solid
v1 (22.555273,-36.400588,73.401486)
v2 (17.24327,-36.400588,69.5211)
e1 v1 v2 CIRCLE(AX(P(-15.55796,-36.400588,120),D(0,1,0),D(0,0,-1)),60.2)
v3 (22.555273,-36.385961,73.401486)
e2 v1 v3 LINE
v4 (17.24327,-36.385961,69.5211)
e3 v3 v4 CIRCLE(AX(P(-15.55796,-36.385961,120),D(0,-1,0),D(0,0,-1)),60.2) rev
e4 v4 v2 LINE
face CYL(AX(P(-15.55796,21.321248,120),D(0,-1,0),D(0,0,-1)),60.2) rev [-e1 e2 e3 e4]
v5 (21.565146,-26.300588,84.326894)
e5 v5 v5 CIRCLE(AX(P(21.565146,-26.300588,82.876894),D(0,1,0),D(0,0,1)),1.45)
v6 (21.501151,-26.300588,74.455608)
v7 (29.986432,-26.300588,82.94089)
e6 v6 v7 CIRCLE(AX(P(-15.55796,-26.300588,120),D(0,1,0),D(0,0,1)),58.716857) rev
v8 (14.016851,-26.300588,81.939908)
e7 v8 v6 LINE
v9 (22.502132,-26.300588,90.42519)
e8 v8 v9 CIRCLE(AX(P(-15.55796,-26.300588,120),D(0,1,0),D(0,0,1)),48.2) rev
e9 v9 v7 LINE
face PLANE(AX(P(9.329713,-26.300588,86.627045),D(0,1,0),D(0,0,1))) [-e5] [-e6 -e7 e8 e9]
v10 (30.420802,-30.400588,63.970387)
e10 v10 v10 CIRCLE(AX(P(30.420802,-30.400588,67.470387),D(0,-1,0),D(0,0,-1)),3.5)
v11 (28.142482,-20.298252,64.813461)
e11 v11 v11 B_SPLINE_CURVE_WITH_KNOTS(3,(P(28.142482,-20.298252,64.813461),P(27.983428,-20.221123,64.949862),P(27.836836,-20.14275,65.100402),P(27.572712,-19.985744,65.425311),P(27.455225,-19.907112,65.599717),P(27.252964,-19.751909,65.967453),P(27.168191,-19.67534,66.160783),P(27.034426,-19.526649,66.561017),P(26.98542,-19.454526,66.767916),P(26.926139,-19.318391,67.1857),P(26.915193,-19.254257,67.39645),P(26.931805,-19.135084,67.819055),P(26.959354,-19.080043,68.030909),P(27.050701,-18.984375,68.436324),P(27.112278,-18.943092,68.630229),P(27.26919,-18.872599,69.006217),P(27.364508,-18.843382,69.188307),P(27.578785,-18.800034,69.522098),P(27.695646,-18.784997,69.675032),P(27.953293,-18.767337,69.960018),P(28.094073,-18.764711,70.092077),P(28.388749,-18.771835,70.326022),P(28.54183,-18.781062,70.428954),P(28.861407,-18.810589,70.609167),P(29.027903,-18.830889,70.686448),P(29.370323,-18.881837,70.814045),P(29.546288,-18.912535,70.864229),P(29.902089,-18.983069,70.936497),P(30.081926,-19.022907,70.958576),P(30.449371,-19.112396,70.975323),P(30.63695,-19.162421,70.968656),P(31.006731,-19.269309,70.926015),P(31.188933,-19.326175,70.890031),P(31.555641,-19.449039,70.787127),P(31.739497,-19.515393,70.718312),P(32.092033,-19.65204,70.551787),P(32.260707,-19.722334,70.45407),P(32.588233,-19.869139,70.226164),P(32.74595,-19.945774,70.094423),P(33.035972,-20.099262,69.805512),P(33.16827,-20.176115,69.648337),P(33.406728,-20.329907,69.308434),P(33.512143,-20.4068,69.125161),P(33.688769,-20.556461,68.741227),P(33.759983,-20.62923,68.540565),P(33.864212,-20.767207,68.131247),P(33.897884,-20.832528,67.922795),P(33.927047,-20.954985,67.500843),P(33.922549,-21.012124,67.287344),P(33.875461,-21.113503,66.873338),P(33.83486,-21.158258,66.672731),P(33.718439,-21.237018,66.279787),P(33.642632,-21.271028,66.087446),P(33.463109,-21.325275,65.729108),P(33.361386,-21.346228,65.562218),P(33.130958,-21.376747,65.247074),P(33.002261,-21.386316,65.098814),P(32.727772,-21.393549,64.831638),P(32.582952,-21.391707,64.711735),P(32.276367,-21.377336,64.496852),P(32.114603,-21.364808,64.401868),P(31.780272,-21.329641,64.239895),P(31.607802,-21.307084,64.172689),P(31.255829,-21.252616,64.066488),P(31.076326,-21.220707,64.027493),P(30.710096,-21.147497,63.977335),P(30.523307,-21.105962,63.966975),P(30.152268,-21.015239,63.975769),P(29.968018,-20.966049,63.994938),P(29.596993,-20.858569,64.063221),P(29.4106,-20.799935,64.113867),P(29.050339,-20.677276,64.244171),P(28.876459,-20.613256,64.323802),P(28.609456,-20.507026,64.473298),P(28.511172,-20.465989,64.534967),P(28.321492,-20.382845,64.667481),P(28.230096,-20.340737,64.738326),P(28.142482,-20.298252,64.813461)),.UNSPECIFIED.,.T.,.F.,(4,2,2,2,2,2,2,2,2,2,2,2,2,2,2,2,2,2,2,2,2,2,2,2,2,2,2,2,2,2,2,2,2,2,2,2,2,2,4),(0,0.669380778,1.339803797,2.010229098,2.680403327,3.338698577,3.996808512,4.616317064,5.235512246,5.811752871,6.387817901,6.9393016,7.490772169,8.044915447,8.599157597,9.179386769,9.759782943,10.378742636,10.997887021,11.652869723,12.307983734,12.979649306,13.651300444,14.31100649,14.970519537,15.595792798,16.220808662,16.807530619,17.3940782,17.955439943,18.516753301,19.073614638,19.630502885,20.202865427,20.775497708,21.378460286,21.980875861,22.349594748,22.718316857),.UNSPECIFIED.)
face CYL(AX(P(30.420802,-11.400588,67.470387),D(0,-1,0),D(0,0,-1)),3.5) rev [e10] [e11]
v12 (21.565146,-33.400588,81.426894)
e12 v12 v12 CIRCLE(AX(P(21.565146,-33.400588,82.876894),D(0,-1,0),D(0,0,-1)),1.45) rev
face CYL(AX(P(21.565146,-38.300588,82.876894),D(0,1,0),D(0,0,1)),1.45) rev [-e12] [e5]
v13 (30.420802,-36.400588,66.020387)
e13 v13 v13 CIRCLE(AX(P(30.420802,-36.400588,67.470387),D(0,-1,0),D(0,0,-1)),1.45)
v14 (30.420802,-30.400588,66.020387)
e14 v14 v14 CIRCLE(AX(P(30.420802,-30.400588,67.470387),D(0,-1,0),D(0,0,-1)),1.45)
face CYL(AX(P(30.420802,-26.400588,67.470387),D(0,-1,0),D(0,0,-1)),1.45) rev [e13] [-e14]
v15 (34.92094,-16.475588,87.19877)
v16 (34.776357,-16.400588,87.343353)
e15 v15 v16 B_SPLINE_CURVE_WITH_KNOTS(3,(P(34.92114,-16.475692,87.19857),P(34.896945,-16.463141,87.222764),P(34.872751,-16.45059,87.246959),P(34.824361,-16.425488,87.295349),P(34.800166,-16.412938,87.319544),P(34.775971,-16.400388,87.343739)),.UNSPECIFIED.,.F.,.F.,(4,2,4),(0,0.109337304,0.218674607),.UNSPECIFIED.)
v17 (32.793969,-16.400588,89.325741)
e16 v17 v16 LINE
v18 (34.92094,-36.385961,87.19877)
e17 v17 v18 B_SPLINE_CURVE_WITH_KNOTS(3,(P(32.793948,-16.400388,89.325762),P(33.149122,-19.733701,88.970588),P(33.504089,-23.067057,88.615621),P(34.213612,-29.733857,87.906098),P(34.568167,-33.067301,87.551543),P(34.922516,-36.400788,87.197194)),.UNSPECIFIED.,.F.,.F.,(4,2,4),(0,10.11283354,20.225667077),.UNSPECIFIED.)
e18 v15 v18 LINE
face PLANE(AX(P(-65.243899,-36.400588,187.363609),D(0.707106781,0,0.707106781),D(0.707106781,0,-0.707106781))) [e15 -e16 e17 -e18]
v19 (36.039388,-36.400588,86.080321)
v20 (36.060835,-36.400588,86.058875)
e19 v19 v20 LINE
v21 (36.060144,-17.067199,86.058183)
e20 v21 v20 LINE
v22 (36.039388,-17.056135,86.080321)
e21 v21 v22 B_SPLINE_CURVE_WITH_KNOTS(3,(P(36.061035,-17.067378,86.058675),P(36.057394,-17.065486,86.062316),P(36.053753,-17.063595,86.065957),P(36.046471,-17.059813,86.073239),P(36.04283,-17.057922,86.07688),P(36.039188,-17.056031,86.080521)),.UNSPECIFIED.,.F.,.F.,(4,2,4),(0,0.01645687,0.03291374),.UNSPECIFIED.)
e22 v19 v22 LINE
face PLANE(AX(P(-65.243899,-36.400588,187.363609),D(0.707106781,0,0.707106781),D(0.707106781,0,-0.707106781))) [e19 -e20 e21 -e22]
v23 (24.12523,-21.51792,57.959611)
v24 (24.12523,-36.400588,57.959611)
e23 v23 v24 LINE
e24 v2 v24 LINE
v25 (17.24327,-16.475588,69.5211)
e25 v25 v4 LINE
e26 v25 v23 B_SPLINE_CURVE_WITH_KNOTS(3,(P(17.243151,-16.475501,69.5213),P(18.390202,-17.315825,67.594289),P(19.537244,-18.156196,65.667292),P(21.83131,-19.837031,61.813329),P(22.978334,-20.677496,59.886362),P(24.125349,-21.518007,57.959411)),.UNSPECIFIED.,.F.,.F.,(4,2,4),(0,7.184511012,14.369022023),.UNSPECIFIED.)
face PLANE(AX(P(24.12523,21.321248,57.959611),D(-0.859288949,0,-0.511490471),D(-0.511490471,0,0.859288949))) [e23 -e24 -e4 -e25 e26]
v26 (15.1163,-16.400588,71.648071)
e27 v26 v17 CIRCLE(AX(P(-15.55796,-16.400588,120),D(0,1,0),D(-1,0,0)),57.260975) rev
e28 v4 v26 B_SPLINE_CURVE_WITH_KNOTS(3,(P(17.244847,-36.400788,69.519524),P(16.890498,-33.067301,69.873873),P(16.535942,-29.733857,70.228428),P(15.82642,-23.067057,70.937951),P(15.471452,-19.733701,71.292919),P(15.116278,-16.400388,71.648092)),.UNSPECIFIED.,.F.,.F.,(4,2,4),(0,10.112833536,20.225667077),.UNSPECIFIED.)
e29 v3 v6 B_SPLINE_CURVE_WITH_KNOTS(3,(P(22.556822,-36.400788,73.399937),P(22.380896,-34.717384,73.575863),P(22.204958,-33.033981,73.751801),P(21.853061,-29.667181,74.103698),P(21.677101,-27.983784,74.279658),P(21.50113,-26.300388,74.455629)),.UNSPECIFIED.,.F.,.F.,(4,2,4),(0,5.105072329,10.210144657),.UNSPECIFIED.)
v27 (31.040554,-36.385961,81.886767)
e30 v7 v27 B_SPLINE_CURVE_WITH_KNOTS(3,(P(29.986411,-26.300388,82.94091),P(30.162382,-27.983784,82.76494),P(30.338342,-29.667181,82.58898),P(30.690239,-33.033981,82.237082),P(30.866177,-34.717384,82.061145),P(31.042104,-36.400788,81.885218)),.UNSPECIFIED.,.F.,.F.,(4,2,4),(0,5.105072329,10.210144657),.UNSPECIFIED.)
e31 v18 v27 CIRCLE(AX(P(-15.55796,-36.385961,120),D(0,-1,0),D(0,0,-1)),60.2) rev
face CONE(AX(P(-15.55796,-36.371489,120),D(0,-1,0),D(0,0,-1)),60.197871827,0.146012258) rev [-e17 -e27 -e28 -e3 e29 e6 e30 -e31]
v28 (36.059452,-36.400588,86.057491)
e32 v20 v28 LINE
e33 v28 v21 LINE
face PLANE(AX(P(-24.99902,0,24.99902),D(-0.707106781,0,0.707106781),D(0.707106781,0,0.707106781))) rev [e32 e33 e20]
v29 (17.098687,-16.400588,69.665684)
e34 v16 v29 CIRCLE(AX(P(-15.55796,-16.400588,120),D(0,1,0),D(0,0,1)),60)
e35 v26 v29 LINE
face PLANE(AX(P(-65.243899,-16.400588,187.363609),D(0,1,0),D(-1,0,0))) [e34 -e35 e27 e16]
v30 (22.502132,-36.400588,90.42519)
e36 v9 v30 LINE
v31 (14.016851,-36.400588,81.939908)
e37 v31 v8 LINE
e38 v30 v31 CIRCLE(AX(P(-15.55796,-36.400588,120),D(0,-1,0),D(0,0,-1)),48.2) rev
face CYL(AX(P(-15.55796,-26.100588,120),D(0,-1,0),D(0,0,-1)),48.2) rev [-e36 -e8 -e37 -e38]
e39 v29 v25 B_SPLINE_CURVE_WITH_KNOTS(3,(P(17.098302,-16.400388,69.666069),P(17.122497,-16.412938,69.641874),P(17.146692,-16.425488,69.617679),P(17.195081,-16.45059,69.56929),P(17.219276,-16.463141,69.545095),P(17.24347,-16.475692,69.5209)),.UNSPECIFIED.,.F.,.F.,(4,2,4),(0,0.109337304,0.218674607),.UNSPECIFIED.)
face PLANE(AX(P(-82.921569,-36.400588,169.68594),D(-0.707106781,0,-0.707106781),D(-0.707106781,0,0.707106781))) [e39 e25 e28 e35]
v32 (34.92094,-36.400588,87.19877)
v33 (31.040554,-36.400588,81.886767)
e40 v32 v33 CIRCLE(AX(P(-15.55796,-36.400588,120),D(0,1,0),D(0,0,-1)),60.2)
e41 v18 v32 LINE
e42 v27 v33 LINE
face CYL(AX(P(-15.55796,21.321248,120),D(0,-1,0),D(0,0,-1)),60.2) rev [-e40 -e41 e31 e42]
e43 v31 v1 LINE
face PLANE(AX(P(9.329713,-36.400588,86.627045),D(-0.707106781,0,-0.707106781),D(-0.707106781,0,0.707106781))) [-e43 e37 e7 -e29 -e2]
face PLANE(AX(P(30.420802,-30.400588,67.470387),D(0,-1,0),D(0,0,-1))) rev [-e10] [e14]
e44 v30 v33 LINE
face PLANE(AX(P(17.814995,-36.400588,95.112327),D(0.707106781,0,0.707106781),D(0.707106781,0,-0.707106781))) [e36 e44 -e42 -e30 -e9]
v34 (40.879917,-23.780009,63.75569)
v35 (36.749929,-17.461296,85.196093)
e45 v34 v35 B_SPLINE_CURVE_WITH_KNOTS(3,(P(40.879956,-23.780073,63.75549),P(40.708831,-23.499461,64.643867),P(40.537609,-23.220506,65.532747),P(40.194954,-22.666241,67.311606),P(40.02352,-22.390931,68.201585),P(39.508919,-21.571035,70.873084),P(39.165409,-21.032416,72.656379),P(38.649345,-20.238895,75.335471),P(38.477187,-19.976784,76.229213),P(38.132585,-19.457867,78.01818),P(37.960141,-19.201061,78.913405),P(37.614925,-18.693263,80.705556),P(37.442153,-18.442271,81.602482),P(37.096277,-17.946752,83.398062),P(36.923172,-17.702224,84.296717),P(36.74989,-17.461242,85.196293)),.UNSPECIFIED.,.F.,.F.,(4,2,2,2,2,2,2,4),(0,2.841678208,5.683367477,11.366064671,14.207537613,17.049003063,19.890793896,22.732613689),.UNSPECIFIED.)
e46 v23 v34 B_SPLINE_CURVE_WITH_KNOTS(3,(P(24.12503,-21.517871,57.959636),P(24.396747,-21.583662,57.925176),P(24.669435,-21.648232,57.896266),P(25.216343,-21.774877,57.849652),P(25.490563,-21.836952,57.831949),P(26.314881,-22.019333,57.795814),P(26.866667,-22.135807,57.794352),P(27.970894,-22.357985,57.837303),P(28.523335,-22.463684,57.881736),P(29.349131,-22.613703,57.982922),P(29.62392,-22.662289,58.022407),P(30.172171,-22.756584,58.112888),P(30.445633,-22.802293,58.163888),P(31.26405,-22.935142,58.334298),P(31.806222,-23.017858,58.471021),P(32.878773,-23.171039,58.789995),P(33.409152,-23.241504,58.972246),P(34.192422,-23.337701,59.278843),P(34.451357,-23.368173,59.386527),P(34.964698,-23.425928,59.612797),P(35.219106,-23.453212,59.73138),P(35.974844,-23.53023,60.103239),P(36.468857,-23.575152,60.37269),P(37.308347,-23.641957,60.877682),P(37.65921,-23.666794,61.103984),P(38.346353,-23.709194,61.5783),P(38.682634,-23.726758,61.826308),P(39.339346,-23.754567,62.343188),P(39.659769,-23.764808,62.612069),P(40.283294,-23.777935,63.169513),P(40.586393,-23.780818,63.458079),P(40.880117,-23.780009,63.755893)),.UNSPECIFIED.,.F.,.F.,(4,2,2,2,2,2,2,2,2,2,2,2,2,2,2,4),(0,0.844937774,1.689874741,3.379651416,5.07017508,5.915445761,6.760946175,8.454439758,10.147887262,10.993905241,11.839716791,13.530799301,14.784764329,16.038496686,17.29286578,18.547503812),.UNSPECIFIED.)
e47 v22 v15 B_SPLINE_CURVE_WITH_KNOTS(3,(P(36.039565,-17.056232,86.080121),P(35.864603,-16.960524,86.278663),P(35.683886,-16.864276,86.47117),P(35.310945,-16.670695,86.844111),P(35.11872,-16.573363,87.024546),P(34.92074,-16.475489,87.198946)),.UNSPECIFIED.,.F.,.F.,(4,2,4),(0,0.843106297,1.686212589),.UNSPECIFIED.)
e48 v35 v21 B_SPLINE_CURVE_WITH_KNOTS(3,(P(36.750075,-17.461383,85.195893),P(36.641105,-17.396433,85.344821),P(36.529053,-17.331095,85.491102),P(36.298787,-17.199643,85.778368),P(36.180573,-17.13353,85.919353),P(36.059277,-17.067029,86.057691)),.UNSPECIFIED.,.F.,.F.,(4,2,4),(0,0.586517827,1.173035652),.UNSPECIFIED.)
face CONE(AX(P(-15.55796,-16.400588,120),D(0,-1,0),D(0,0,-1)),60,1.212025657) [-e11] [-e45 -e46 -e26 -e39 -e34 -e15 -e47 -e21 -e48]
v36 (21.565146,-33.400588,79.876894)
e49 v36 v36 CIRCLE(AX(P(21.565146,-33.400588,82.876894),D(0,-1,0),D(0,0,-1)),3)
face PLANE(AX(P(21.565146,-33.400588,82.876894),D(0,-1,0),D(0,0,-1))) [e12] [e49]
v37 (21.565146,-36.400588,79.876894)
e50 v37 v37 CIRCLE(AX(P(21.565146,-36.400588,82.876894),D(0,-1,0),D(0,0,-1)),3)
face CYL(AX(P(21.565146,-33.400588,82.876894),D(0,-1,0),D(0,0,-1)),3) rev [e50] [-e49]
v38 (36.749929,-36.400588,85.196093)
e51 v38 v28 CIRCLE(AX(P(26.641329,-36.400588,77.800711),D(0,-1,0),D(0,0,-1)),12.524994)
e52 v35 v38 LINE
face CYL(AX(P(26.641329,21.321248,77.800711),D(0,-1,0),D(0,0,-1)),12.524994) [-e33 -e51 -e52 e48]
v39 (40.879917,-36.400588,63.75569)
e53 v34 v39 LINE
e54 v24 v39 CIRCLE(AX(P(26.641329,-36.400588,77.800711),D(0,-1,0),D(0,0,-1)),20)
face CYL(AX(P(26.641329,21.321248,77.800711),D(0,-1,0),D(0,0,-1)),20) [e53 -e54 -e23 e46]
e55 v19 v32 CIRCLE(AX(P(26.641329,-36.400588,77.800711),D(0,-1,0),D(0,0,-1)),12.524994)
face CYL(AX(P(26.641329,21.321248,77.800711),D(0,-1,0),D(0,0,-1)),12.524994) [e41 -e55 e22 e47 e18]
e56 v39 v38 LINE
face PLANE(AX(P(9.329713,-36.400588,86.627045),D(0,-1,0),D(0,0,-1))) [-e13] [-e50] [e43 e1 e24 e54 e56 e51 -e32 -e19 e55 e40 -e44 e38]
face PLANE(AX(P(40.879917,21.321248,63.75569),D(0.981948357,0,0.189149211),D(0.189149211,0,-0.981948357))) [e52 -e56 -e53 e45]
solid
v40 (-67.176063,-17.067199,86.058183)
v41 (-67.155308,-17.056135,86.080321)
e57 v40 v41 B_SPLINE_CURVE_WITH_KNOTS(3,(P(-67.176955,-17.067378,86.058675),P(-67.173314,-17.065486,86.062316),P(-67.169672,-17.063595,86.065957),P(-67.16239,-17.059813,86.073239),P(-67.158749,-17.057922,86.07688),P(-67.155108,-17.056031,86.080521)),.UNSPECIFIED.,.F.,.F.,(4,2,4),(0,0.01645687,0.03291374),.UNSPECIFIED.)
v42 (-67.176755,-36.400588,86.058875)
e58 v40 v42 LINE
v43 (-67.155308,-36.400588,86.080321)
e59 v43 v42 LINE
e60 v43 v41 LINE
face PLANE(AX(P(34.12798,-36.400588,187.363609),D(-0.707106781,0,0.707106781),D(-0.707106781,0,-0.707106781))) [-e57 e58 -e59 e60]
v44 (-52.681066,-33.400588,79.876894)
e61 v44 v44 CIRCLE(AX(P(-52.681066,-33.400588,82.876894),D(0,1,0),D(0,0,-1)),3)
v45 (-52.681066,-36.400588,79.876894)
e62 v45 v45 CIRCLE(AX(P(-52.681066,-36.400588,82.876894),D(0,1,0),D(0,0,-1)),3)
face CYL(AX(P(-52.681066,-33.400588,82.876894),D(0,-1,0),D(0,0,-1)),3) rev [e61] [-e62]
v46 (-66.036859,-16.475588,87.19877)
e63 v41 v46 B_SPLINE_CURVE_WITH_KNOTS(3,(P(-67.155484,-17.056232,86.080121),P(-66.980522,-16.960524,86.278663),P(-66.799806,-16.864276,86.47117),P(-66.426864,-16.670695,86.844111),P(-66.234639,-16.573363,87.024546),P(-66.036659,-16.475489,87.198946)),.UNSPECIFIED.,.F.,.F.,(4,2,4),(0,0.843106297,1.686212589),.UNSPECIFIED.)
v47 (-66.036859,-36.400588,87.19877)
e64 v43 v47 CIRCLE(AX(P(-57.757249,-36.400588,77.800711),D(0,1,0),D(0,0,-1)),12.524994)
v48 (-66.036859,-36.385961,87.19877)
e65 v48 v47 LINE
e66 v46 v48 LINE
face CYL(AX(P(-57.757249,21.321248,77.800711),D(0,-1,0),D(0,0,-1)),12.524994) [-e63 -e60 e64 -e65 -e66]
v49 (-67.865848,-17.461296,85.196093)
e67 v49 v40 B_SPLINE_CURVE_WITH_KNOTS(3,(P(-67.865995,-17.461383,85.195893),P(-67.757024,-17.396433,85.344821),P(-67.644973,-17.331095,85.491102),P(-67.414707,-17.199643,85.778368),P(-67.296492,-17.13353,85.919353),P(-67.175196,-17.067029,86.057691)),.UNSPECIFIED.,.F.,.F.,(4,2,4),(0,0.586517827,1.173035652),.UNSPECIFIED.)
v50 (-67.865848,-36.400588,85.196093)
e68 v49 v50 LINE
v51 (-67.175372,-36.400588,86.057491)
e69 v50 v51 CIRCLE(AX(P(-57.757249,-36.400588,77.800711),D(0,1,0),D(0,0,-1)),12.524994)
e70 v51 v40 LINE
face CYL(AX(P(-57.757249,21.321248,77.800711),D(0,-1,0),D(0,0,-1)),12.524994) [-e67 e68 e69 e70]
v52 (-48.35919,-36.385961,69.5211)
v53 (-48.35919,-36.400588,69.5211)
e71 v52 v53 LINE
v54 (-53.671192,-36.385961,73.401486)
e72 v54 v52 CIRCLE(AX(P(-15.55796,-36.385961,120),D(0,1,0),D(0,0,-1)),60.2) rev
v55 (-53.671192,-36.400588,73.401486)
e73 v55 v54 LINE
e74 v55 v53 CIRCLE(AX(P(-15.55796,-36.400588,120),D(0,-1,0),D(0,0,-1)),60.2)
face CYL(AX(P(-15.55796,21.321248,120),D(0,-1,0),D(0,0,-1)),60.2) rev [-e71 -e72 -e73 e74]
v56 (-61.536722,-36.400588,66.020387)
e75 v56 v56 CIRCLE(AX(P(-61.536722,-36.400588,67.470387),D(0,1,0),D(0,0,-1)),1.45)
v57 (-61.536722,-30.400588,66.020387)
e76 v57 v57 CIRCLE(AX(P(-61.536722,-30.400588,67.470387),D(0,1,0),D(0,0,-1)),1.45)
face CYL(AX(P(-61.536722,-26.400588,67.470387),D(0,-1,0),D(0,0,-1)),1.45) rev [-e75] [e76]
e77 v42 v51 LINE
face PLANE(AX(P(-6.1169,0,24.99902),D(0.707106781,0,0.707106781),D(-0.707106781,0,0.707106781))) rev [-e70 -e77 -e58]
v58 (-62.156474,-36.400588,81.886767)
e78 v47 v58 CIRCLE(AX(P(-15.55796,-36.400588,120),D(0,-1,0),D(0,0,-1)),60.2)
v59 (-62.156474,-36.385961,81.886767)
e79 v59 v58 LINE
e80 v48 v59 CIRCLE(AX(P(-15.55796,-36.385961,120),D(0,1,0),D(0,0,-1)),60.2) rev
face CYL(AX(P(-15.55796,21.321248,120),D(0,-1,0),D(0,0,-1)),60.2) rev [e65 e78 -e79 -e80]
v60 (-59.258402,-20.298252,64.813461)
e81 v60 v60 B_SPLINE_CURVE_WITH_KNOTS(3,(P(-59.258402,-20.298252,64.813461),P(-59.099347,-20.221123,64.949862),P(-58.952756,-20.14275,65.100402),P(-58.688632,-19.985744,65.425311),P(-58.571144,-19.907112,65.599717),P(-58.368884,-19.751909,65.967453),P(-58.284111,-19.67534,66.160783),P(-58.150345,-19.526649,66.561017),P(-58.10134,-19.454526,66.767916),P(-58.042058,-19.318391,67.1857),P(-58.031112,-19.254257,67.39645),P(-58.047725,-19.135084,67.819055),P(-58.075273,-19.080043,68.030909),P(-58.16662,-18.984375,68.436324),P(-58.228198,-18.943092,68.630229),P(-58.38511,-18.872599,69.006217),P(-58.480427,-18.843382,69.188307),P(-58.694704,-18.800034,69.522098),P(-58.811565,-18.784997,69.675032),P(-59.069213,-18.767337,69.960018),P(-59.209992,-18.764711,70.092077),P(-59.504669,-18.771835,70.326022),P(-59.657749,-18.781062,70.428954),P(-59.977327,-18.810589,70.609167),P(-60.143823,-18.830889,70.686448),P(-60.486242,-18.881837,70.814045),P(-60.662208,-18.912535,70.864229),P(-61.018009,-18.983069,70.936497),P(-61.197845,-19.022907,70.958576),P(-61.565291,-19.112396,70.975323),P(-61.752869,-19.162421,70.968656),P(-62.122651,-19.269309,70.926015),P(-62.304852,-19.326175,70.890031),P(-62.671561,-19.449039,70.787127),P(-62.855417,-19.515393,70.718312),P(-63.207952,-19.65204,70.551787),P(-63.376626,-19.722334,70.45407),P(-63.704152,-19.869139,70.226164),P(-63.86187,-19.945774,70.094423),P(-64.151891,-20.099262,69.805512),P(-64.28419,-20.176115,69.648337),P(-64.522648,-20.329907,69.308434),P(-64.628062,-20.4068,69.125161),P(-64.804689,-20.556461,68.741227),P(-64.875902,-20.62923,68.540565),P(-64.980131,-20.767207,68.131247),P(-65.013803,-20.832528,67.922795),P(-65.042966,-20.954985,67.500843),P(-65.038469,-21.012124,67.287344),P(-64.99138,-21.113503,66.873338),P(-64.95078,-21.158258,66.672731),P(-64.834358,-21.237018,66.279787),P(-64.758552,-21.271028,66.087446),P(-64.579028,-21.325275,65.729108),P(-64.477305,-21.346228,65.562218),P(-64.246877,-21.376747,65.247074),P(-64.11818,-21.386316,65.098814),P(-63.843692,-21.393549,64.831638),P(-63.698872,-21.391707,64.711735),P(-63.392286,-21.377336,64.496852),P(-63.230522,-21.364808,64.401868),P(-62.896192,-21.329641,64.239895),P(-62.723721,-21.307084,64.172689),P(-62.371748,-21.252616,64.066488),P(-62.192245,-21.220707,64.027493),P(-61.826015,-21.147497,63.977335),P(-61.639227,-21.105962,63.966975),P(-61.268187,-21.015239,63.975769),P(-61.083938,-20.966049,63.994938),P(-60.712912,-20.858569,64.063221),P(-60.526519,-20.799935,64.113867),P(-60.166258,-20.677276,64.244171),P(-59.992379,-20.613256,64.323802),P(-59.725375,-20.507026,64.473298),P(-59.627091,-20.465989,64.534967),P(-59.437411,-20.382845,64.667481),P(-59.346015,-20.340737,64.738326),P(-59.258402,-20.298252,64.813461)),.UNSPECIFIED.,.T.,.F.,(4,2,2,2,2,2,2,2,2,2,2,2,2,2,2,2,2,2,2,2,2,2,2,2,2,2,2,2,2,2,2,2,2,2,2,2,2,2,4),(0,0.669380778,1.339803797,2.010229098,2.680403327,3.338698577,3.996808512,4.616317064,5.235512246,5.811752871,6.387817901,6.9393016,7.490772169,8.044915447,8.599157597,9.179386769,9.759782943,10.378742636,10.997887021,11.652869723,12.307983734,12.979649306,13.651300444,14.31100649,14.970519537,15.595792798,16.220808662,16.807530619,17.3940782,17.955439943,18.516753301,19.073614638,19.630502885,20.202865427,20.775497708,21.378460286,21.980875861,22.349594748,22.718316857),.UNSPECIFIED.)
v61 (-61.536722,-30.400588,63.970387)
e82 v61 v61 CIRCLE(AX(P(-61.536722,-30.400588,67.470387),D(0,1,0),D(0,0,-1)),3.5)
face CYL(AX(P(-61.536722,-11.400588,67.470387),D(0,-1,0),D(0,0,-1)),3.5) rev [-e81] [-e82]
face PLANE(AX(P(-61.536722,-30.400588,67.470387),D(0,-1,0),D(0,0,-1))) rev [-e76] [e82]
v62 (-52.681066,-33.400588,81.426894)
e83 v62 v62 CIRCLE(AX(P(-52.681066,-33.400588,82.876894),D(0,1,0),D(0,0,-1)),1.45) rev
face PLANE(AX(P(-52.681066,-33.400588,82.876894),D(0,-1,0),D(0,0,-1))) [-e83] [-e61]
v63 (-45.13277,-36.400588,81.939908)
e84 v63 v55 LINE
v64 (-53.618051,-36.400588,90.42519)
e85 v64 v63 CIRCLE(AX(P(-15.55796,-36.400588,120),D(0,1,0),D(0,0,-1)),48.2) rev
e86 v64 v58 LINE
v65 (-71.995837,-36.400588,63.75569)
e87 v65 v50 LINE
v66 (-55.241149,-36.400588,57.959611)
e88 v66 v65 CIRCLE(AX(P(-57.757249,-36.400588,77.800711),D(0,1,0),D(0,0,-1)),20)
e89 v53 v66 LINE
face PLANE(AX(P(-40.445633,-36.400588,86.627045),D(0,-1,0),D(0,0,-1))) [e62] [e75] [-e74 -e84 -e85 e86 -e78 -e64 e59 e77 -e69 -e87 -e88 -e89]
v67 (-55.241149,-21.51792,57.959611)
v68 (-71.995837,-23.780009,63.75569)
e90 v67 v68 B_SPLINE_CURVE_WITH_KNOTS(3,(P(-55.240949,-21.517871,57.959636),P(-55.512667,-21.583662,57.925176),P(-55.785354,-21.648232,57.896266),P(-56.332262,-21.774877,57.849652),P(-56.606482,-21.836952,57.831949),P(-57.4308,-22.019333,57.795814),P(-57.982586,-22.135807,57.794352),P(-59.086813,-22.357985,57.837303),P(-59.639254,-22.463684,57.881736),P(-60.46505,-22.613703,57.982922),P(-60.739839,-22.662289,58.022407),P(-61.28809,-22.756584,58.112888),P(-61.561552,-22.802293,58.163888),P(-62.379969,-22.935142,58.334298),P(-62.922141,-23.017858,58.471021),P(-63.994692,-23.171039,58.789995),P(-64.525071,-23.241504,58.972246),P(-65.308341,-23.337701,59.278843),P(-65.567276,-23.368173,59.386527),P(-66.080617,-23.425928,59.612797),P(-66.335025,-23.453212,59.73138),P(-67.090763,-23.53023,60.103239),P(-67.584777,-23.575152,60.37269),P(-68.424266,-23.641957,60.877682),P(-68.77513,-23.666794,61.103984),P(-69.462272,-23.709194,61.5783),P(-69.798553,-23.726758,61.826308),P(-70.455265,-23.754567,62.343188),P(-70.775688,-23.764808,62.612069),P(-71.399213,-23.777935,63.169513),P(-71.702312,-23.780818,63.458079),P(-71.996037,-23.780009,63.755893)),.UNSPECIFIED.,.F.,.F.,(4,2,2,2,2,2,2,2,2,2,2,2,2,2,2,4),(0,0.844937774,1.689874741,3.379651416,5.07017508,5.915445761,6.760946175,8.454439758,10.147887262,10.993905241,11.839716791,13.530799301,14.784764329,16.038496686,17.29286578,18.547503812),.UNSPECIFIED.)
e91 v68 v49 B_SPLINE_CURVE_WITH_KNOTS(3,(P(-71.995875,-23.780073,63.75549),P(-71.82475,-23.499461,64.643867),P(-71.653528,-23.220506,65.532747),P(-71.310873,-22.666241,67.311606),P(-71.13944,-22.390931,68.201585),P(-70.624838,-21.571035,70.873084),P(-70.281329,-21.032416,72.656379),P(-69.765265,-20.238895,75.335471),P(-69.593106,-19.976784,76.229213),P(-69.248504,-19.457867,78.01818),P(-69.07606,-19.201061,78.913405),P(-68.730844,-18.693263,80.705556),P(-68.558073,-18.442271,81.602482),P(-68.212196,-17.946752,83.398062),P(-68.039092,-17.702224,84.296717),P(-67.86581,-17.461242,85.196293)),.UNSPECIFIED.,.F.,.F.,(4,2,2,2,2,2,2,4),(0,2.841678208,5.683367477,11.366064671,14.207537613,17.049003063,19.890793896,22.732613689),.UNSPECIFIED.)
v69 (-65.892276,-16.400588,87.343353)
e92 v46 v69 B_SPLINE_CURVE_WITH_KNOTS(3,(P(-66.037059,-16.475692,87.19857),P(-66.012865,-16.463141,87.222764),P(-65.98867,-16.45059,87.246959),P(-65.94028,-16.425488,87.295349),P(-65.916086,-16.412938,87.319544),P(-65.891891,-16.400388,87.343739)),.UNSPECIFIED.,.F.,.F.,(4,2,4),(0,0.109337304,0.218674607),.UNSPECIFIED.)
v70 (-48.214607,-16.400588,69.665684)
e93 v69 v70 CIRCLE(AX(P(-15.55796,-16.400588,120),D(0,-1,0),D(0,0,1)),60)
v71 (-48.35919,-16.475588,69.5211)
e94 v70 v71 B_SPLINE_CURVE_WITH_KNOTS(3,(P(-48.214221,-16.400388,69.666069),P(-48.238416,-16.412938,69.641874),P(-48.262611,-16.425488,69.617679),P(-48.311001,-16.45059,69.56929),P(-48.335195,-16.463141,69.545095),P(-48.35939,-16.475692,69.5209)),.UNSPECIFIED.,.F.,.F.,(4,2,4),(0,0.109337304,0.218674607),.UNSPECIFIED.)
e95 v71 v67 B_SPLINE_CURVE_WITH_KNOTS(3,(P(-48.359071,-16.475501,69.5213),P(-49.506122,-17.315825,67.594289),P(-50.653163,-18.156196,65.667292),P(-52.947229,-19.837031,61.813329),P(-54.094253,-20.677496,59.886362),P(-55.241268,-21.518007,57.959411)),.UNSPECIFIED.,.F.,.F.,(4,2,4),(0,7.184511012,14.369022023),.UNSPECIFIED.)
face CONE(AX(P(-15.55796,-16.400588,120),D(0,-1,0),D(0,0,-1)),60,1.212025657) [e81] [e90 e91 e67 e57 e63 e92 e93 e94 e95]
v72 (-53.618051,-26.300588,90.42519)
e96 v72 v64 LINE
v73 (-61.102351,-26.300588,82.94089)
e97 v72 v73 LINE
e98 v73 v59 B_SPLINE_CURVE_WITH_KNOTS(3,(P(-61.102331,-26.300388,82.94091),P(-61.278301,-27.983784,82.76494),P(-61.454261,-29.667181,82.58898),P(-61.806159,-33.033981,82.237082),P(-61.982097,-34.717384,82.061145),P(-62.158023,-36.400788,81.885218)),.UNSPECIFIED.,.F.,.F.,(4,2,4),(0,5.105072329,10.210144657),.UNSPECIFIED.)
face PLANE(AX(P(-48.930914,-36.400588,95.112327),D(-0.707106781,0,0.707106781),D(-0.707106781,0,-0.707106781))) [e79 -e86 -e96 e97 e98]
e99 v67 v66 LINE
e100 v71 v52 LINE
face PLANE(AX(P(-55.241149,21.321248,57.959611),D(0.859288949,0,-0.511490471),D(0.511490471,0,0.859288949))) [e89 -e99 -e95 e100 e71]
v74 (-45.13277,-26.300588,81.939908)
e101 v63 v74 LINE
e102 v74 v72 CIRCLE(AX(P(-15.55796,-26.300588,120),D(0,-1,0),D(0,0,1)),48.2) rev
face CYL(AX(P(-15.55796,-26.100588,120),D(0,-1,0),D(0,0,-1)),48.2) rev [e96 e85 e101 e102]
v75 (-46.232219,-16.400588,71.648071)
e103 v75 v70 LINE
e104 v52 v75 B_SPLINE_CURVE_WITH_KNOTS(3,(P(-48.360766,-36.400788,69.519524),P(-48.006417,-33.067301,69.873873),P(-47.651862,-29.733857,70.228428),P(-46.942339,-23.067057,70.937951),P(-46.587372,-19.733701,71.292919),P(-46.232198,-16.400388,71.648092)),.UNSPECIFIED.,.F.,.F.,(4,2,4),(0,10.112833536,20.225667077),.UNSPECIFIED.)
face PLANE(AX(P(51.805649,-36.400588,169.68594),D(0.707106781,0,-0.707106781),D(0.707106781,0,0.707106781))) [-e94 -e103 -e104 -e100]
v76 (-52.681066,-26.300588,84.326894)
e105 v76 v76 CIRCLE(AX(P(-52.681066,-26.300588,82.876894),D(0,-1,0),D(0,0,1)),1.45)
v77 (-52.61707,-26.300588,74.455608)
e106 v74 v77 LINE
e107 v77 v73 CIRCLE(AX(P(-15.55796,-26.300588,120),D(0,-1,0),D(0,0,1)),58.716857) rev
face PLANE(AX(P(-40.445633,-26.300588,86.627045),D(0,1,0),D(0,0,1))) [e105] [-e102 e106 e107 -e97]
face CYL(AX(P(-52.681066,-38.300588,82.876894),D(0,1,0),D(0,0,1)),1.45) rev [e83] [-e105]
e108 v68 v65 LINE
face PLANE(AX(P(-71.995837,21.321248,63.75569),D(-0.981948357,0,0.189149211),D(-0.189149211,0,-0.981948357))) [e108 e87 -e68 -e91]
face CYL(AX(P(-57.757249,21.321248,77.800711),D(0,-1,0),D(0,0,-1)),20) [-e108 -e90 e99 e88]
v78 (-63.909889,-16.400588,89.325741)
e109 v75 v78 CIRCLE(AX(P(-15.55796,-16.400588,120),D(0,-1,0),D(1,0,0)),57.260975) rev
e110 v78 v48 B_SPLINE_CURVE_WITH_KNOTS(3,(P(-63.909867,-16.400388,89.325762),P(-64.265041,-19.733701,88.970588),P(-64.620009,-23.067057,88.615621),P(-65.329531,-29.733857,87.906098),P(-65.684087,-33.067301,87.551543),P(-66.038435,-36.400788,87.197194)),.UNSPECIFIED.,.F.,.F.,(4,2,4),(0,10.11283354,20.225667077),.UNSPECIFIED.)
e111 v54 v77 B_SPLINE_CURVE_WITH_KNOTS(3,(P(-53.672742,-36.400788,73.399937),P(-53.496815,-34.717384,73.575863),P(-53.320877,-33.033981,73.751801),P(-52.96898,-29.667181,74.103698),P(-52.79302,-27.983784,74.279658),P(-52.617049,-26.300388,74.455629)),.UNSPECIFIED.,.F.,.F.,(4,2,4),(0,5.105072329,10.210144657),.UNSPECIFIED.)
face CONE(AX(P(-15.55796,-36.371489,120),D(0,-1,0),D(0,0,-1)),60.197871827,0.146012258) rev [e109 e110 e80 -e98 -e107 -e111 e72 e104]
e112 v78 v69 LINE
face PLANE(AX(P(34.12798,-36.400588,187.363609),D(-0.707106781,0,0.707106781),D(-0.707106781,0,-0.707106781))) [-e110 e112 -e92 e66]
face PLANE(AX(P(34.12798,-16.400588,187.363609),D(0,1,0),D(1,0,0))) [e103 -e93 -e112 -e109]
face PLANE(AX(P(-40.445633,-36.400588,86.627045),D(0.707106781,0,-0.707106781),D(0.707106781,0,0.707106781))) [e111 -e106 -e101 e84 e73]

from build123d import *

# Parameters (mm, degrees)
SALIENTE_EXTRUIR1_START = -36.400588291
SALIENTE_EXTRUIR1_DEPTH = 10.1
SALIENTE_EXTRUIR2_REACH = 99.517
SALIENTE_EXTRUIR2_START = -2.5
CROQUIS2_W              = 25
CROQUIS2_H              = 20
SALIENTE_EXTRUIR3_REACH = 101.384
CORTAR_EXTRUIR1_START   = -6
CROQUIS5_R              = 3.5
CORTAR_EXTRUIR1_DEPTH   = 19
CROQUIS7_R              = 1.45
CORTAR_EXTRUIR2_DEPTH   = 10
CROQUIS8_R              = 1.45
CORTAR_EXTRUIR3_DEPTH   = 12
CROQUIS9_R              = 3
CORTAR_EXTRUIR4_DEPTH   = 3


# Read off the part's stored shape, not the designer's step: Saliente-Extruir1
with BuildPart() as part:
    # Saliente-Extruir1 outline → Saliente-Extruir1 (new body)
    with BuildSketch(Plane(origin=(0, 0, 0), x_dir=(1, 0, 0), z_dir=(0, 1, 0)).offset(SALIENTE_EXTRUIR1_START)):
        with BuildLine():
            Line((22.502132111, -90.425189571), (33.23240821, -79.694913472))
            Line((33.23240821, -79.694913472), (24.747126835, -71.209632098))
            Line((24.747126835, -71.209632098), (14.016850737, -81.939908197))
            ThreePointArc((14.016850737, -81.939908197), (18.524587161, -85.917453147), (22.502132111, -90.425189571))
        make_face()
    extrude(amount=SALIENTE_EXTRUIR1_DEPTH)

    # Saliente-Extruir2: up to this cone (the profile starts outside it)
    saliente_extruir2_end = Plane(origin=(-15.557959692, -26.400588, 120), z_dir=(0, -1, 0)) * Cone(35.386185904, 82.076939664, 317.497125568, mode=Mode.PRIVATE)
    # Croquis2 → Saliente-Extruir2 (add, up to the surface)
    with BuildSketch(Plane(origin=(-23.231252631, 0, 23.231252631), x_dir=(-0.7071067811865487, 0, -0.7071067811865464), z_dir=(0.7071067811865464, 0, -0.7071067811865487)).offset(SALIENTE_EXTRUIR2_START), mode=Mode.PRIVATE) as saliente_extruir2_sk1:
        with Locations((-73.851674943, -26.400588291)):
            Rectangle(CROQUIS2_W, CROQUIS2_H)
    saliente_extruir2_tool1 = extrude(saliente_extruir2_sk1.sketch, amount=-SALIENTE_EXTRUIR2_REACH, mode=Mode.PRIVATE) - saliente_extruir2_end
    add(saliente_extruir2_tool1.solids().sort_by_distance((27.222001, -26.400588, 77.22004))[0])

    # Saliente-Extruir3: up to this face of the body (flat: up to its plane)
    saliente_extruir3_end = Plane(part.part.faces().sort_by_distance((25.898715454, -16.400588291, 78.543324853))[0])
    # Croquis3 → Saliente-Extruir3 (add, up to the picked face)
    with BuildSketch(Plane.XZ.offset(36.400588291), mode=Mode.PRIVATE) as saliente_extruir3_sk1:
        with BuildLine():
            Line((24.125229727, 57.959611077), (17.243270384, 69.521100394))
            ThreePointArc((17.243270384, 69.521100394), (27.009868535, 77.432171773), (34.920939914, 87.198769923))
            ThreePointArc((34.920939914, 87.198769923), (35.889801945, 86.247084042), (36.74992881, 85.196093352))
            Line((36.74992881, 85.196093352), (40.879917291, 63.755689906))
            ThreePointArc((40.879917291, 63.755689906), (33.179893077, 58.8997272), (24.125229727, 57.959611077))
        make_face()
    saliente_extruir3_tool1 = split(extrude(saliente_extruir3_sk1.sketch, amount=-SALIENTE_EXTRUIR3_REACH, mode=Mode.PRIVATE), bisect_by=saliente_extruir3_end, keep=Keep.BOTH, mode=Mode.PRIVATE)
    add(saliente_extruir3_tool1.solids().sort_by(Axis((30.570444, -36.400588, 69.72951), (0, 1, 0)))[0])

    # Croquis4 → Cortar-Revolución1 (revolve, cut)
    with BuildSketch(Plane(origin=(-15.557959692, -2.400588291, 120), x_dir=(0, 0, -1), z_dir=(1, 0, 0))):
        Polygon((60, -14), (100, -29), (100, -12.364078099), (60, -12.364078099), align=None)
    revolve(axis=Axis((-15.557959692, -2.400588291, 120), (0, -1, 0)), mode=Mode.SUBTRACT)

    # Croquis5 → Cortar-Extruir1 (cut)
    with BuildSketch(Plane.XZ.offset(36.400588291).offset(CORTAR_EXTRUIR1_START)):
        with Locations(Location((30.420802392, 67.470387392, 0), (0, 0, 270))):
            Circle(CROQUIS5_R)
    extrude(amount=-CORTAR_EXTRUIR1_DEPTH, mode=Mode.SUBTRACT)

    # Croquis7 → Cortar-Extruir2 (cut)
    with BuildSketch(Plane.XZ.offset(36.400588291)):
        with Locations(Location((30.420802392, 67.470387392, 0), (0, 0, 270))):
            Circle(CROQUIS7_R)
    extrude(amount=-CORTAR_EXTRUIR2_DEPTH, mode=Mode.SUBTRACT)

    # Croquis8 → Cortar-Extruir3 (cut)
    with BuildSketch(Plane(origin=(0, -26.300588291, 0), x_dir=(1, 0, 0), z_dir=(0, 1, 0))):
        with Locations(Location((21.56514632, -82.876893988, 0), (0, 0, 270))):
            Circle(CROQUIS8_R)
    extrude(amount=-CORTAR_EXTRUIR3_DEPTH, mode=Mode.SUBTRACT)

    # Croquis9 → Cortar-Extruir4 (cut)
    with BuildSketch(Plane.XZ.offset(36.400588291)):
        with Locations(Location((21.56514632, 82.876893988, 0), (0, 0, 270))):
            Circle(CROQUIS9_R)
    extrude(amount=-CORTAR_EXTRUIR4_DEPTH, mode=Mode.SUBTRACT)


with BuildPart() as body_2:
    # Simetría5: mirrored copy
    add(part.part.mirror(Plane(origin=(-15.557959692, -2.400588291, 120), x_dir=(0, 0, 1), z_dir=(1, 0, 0))))


solid = Compound([part.part, body_2.part])
